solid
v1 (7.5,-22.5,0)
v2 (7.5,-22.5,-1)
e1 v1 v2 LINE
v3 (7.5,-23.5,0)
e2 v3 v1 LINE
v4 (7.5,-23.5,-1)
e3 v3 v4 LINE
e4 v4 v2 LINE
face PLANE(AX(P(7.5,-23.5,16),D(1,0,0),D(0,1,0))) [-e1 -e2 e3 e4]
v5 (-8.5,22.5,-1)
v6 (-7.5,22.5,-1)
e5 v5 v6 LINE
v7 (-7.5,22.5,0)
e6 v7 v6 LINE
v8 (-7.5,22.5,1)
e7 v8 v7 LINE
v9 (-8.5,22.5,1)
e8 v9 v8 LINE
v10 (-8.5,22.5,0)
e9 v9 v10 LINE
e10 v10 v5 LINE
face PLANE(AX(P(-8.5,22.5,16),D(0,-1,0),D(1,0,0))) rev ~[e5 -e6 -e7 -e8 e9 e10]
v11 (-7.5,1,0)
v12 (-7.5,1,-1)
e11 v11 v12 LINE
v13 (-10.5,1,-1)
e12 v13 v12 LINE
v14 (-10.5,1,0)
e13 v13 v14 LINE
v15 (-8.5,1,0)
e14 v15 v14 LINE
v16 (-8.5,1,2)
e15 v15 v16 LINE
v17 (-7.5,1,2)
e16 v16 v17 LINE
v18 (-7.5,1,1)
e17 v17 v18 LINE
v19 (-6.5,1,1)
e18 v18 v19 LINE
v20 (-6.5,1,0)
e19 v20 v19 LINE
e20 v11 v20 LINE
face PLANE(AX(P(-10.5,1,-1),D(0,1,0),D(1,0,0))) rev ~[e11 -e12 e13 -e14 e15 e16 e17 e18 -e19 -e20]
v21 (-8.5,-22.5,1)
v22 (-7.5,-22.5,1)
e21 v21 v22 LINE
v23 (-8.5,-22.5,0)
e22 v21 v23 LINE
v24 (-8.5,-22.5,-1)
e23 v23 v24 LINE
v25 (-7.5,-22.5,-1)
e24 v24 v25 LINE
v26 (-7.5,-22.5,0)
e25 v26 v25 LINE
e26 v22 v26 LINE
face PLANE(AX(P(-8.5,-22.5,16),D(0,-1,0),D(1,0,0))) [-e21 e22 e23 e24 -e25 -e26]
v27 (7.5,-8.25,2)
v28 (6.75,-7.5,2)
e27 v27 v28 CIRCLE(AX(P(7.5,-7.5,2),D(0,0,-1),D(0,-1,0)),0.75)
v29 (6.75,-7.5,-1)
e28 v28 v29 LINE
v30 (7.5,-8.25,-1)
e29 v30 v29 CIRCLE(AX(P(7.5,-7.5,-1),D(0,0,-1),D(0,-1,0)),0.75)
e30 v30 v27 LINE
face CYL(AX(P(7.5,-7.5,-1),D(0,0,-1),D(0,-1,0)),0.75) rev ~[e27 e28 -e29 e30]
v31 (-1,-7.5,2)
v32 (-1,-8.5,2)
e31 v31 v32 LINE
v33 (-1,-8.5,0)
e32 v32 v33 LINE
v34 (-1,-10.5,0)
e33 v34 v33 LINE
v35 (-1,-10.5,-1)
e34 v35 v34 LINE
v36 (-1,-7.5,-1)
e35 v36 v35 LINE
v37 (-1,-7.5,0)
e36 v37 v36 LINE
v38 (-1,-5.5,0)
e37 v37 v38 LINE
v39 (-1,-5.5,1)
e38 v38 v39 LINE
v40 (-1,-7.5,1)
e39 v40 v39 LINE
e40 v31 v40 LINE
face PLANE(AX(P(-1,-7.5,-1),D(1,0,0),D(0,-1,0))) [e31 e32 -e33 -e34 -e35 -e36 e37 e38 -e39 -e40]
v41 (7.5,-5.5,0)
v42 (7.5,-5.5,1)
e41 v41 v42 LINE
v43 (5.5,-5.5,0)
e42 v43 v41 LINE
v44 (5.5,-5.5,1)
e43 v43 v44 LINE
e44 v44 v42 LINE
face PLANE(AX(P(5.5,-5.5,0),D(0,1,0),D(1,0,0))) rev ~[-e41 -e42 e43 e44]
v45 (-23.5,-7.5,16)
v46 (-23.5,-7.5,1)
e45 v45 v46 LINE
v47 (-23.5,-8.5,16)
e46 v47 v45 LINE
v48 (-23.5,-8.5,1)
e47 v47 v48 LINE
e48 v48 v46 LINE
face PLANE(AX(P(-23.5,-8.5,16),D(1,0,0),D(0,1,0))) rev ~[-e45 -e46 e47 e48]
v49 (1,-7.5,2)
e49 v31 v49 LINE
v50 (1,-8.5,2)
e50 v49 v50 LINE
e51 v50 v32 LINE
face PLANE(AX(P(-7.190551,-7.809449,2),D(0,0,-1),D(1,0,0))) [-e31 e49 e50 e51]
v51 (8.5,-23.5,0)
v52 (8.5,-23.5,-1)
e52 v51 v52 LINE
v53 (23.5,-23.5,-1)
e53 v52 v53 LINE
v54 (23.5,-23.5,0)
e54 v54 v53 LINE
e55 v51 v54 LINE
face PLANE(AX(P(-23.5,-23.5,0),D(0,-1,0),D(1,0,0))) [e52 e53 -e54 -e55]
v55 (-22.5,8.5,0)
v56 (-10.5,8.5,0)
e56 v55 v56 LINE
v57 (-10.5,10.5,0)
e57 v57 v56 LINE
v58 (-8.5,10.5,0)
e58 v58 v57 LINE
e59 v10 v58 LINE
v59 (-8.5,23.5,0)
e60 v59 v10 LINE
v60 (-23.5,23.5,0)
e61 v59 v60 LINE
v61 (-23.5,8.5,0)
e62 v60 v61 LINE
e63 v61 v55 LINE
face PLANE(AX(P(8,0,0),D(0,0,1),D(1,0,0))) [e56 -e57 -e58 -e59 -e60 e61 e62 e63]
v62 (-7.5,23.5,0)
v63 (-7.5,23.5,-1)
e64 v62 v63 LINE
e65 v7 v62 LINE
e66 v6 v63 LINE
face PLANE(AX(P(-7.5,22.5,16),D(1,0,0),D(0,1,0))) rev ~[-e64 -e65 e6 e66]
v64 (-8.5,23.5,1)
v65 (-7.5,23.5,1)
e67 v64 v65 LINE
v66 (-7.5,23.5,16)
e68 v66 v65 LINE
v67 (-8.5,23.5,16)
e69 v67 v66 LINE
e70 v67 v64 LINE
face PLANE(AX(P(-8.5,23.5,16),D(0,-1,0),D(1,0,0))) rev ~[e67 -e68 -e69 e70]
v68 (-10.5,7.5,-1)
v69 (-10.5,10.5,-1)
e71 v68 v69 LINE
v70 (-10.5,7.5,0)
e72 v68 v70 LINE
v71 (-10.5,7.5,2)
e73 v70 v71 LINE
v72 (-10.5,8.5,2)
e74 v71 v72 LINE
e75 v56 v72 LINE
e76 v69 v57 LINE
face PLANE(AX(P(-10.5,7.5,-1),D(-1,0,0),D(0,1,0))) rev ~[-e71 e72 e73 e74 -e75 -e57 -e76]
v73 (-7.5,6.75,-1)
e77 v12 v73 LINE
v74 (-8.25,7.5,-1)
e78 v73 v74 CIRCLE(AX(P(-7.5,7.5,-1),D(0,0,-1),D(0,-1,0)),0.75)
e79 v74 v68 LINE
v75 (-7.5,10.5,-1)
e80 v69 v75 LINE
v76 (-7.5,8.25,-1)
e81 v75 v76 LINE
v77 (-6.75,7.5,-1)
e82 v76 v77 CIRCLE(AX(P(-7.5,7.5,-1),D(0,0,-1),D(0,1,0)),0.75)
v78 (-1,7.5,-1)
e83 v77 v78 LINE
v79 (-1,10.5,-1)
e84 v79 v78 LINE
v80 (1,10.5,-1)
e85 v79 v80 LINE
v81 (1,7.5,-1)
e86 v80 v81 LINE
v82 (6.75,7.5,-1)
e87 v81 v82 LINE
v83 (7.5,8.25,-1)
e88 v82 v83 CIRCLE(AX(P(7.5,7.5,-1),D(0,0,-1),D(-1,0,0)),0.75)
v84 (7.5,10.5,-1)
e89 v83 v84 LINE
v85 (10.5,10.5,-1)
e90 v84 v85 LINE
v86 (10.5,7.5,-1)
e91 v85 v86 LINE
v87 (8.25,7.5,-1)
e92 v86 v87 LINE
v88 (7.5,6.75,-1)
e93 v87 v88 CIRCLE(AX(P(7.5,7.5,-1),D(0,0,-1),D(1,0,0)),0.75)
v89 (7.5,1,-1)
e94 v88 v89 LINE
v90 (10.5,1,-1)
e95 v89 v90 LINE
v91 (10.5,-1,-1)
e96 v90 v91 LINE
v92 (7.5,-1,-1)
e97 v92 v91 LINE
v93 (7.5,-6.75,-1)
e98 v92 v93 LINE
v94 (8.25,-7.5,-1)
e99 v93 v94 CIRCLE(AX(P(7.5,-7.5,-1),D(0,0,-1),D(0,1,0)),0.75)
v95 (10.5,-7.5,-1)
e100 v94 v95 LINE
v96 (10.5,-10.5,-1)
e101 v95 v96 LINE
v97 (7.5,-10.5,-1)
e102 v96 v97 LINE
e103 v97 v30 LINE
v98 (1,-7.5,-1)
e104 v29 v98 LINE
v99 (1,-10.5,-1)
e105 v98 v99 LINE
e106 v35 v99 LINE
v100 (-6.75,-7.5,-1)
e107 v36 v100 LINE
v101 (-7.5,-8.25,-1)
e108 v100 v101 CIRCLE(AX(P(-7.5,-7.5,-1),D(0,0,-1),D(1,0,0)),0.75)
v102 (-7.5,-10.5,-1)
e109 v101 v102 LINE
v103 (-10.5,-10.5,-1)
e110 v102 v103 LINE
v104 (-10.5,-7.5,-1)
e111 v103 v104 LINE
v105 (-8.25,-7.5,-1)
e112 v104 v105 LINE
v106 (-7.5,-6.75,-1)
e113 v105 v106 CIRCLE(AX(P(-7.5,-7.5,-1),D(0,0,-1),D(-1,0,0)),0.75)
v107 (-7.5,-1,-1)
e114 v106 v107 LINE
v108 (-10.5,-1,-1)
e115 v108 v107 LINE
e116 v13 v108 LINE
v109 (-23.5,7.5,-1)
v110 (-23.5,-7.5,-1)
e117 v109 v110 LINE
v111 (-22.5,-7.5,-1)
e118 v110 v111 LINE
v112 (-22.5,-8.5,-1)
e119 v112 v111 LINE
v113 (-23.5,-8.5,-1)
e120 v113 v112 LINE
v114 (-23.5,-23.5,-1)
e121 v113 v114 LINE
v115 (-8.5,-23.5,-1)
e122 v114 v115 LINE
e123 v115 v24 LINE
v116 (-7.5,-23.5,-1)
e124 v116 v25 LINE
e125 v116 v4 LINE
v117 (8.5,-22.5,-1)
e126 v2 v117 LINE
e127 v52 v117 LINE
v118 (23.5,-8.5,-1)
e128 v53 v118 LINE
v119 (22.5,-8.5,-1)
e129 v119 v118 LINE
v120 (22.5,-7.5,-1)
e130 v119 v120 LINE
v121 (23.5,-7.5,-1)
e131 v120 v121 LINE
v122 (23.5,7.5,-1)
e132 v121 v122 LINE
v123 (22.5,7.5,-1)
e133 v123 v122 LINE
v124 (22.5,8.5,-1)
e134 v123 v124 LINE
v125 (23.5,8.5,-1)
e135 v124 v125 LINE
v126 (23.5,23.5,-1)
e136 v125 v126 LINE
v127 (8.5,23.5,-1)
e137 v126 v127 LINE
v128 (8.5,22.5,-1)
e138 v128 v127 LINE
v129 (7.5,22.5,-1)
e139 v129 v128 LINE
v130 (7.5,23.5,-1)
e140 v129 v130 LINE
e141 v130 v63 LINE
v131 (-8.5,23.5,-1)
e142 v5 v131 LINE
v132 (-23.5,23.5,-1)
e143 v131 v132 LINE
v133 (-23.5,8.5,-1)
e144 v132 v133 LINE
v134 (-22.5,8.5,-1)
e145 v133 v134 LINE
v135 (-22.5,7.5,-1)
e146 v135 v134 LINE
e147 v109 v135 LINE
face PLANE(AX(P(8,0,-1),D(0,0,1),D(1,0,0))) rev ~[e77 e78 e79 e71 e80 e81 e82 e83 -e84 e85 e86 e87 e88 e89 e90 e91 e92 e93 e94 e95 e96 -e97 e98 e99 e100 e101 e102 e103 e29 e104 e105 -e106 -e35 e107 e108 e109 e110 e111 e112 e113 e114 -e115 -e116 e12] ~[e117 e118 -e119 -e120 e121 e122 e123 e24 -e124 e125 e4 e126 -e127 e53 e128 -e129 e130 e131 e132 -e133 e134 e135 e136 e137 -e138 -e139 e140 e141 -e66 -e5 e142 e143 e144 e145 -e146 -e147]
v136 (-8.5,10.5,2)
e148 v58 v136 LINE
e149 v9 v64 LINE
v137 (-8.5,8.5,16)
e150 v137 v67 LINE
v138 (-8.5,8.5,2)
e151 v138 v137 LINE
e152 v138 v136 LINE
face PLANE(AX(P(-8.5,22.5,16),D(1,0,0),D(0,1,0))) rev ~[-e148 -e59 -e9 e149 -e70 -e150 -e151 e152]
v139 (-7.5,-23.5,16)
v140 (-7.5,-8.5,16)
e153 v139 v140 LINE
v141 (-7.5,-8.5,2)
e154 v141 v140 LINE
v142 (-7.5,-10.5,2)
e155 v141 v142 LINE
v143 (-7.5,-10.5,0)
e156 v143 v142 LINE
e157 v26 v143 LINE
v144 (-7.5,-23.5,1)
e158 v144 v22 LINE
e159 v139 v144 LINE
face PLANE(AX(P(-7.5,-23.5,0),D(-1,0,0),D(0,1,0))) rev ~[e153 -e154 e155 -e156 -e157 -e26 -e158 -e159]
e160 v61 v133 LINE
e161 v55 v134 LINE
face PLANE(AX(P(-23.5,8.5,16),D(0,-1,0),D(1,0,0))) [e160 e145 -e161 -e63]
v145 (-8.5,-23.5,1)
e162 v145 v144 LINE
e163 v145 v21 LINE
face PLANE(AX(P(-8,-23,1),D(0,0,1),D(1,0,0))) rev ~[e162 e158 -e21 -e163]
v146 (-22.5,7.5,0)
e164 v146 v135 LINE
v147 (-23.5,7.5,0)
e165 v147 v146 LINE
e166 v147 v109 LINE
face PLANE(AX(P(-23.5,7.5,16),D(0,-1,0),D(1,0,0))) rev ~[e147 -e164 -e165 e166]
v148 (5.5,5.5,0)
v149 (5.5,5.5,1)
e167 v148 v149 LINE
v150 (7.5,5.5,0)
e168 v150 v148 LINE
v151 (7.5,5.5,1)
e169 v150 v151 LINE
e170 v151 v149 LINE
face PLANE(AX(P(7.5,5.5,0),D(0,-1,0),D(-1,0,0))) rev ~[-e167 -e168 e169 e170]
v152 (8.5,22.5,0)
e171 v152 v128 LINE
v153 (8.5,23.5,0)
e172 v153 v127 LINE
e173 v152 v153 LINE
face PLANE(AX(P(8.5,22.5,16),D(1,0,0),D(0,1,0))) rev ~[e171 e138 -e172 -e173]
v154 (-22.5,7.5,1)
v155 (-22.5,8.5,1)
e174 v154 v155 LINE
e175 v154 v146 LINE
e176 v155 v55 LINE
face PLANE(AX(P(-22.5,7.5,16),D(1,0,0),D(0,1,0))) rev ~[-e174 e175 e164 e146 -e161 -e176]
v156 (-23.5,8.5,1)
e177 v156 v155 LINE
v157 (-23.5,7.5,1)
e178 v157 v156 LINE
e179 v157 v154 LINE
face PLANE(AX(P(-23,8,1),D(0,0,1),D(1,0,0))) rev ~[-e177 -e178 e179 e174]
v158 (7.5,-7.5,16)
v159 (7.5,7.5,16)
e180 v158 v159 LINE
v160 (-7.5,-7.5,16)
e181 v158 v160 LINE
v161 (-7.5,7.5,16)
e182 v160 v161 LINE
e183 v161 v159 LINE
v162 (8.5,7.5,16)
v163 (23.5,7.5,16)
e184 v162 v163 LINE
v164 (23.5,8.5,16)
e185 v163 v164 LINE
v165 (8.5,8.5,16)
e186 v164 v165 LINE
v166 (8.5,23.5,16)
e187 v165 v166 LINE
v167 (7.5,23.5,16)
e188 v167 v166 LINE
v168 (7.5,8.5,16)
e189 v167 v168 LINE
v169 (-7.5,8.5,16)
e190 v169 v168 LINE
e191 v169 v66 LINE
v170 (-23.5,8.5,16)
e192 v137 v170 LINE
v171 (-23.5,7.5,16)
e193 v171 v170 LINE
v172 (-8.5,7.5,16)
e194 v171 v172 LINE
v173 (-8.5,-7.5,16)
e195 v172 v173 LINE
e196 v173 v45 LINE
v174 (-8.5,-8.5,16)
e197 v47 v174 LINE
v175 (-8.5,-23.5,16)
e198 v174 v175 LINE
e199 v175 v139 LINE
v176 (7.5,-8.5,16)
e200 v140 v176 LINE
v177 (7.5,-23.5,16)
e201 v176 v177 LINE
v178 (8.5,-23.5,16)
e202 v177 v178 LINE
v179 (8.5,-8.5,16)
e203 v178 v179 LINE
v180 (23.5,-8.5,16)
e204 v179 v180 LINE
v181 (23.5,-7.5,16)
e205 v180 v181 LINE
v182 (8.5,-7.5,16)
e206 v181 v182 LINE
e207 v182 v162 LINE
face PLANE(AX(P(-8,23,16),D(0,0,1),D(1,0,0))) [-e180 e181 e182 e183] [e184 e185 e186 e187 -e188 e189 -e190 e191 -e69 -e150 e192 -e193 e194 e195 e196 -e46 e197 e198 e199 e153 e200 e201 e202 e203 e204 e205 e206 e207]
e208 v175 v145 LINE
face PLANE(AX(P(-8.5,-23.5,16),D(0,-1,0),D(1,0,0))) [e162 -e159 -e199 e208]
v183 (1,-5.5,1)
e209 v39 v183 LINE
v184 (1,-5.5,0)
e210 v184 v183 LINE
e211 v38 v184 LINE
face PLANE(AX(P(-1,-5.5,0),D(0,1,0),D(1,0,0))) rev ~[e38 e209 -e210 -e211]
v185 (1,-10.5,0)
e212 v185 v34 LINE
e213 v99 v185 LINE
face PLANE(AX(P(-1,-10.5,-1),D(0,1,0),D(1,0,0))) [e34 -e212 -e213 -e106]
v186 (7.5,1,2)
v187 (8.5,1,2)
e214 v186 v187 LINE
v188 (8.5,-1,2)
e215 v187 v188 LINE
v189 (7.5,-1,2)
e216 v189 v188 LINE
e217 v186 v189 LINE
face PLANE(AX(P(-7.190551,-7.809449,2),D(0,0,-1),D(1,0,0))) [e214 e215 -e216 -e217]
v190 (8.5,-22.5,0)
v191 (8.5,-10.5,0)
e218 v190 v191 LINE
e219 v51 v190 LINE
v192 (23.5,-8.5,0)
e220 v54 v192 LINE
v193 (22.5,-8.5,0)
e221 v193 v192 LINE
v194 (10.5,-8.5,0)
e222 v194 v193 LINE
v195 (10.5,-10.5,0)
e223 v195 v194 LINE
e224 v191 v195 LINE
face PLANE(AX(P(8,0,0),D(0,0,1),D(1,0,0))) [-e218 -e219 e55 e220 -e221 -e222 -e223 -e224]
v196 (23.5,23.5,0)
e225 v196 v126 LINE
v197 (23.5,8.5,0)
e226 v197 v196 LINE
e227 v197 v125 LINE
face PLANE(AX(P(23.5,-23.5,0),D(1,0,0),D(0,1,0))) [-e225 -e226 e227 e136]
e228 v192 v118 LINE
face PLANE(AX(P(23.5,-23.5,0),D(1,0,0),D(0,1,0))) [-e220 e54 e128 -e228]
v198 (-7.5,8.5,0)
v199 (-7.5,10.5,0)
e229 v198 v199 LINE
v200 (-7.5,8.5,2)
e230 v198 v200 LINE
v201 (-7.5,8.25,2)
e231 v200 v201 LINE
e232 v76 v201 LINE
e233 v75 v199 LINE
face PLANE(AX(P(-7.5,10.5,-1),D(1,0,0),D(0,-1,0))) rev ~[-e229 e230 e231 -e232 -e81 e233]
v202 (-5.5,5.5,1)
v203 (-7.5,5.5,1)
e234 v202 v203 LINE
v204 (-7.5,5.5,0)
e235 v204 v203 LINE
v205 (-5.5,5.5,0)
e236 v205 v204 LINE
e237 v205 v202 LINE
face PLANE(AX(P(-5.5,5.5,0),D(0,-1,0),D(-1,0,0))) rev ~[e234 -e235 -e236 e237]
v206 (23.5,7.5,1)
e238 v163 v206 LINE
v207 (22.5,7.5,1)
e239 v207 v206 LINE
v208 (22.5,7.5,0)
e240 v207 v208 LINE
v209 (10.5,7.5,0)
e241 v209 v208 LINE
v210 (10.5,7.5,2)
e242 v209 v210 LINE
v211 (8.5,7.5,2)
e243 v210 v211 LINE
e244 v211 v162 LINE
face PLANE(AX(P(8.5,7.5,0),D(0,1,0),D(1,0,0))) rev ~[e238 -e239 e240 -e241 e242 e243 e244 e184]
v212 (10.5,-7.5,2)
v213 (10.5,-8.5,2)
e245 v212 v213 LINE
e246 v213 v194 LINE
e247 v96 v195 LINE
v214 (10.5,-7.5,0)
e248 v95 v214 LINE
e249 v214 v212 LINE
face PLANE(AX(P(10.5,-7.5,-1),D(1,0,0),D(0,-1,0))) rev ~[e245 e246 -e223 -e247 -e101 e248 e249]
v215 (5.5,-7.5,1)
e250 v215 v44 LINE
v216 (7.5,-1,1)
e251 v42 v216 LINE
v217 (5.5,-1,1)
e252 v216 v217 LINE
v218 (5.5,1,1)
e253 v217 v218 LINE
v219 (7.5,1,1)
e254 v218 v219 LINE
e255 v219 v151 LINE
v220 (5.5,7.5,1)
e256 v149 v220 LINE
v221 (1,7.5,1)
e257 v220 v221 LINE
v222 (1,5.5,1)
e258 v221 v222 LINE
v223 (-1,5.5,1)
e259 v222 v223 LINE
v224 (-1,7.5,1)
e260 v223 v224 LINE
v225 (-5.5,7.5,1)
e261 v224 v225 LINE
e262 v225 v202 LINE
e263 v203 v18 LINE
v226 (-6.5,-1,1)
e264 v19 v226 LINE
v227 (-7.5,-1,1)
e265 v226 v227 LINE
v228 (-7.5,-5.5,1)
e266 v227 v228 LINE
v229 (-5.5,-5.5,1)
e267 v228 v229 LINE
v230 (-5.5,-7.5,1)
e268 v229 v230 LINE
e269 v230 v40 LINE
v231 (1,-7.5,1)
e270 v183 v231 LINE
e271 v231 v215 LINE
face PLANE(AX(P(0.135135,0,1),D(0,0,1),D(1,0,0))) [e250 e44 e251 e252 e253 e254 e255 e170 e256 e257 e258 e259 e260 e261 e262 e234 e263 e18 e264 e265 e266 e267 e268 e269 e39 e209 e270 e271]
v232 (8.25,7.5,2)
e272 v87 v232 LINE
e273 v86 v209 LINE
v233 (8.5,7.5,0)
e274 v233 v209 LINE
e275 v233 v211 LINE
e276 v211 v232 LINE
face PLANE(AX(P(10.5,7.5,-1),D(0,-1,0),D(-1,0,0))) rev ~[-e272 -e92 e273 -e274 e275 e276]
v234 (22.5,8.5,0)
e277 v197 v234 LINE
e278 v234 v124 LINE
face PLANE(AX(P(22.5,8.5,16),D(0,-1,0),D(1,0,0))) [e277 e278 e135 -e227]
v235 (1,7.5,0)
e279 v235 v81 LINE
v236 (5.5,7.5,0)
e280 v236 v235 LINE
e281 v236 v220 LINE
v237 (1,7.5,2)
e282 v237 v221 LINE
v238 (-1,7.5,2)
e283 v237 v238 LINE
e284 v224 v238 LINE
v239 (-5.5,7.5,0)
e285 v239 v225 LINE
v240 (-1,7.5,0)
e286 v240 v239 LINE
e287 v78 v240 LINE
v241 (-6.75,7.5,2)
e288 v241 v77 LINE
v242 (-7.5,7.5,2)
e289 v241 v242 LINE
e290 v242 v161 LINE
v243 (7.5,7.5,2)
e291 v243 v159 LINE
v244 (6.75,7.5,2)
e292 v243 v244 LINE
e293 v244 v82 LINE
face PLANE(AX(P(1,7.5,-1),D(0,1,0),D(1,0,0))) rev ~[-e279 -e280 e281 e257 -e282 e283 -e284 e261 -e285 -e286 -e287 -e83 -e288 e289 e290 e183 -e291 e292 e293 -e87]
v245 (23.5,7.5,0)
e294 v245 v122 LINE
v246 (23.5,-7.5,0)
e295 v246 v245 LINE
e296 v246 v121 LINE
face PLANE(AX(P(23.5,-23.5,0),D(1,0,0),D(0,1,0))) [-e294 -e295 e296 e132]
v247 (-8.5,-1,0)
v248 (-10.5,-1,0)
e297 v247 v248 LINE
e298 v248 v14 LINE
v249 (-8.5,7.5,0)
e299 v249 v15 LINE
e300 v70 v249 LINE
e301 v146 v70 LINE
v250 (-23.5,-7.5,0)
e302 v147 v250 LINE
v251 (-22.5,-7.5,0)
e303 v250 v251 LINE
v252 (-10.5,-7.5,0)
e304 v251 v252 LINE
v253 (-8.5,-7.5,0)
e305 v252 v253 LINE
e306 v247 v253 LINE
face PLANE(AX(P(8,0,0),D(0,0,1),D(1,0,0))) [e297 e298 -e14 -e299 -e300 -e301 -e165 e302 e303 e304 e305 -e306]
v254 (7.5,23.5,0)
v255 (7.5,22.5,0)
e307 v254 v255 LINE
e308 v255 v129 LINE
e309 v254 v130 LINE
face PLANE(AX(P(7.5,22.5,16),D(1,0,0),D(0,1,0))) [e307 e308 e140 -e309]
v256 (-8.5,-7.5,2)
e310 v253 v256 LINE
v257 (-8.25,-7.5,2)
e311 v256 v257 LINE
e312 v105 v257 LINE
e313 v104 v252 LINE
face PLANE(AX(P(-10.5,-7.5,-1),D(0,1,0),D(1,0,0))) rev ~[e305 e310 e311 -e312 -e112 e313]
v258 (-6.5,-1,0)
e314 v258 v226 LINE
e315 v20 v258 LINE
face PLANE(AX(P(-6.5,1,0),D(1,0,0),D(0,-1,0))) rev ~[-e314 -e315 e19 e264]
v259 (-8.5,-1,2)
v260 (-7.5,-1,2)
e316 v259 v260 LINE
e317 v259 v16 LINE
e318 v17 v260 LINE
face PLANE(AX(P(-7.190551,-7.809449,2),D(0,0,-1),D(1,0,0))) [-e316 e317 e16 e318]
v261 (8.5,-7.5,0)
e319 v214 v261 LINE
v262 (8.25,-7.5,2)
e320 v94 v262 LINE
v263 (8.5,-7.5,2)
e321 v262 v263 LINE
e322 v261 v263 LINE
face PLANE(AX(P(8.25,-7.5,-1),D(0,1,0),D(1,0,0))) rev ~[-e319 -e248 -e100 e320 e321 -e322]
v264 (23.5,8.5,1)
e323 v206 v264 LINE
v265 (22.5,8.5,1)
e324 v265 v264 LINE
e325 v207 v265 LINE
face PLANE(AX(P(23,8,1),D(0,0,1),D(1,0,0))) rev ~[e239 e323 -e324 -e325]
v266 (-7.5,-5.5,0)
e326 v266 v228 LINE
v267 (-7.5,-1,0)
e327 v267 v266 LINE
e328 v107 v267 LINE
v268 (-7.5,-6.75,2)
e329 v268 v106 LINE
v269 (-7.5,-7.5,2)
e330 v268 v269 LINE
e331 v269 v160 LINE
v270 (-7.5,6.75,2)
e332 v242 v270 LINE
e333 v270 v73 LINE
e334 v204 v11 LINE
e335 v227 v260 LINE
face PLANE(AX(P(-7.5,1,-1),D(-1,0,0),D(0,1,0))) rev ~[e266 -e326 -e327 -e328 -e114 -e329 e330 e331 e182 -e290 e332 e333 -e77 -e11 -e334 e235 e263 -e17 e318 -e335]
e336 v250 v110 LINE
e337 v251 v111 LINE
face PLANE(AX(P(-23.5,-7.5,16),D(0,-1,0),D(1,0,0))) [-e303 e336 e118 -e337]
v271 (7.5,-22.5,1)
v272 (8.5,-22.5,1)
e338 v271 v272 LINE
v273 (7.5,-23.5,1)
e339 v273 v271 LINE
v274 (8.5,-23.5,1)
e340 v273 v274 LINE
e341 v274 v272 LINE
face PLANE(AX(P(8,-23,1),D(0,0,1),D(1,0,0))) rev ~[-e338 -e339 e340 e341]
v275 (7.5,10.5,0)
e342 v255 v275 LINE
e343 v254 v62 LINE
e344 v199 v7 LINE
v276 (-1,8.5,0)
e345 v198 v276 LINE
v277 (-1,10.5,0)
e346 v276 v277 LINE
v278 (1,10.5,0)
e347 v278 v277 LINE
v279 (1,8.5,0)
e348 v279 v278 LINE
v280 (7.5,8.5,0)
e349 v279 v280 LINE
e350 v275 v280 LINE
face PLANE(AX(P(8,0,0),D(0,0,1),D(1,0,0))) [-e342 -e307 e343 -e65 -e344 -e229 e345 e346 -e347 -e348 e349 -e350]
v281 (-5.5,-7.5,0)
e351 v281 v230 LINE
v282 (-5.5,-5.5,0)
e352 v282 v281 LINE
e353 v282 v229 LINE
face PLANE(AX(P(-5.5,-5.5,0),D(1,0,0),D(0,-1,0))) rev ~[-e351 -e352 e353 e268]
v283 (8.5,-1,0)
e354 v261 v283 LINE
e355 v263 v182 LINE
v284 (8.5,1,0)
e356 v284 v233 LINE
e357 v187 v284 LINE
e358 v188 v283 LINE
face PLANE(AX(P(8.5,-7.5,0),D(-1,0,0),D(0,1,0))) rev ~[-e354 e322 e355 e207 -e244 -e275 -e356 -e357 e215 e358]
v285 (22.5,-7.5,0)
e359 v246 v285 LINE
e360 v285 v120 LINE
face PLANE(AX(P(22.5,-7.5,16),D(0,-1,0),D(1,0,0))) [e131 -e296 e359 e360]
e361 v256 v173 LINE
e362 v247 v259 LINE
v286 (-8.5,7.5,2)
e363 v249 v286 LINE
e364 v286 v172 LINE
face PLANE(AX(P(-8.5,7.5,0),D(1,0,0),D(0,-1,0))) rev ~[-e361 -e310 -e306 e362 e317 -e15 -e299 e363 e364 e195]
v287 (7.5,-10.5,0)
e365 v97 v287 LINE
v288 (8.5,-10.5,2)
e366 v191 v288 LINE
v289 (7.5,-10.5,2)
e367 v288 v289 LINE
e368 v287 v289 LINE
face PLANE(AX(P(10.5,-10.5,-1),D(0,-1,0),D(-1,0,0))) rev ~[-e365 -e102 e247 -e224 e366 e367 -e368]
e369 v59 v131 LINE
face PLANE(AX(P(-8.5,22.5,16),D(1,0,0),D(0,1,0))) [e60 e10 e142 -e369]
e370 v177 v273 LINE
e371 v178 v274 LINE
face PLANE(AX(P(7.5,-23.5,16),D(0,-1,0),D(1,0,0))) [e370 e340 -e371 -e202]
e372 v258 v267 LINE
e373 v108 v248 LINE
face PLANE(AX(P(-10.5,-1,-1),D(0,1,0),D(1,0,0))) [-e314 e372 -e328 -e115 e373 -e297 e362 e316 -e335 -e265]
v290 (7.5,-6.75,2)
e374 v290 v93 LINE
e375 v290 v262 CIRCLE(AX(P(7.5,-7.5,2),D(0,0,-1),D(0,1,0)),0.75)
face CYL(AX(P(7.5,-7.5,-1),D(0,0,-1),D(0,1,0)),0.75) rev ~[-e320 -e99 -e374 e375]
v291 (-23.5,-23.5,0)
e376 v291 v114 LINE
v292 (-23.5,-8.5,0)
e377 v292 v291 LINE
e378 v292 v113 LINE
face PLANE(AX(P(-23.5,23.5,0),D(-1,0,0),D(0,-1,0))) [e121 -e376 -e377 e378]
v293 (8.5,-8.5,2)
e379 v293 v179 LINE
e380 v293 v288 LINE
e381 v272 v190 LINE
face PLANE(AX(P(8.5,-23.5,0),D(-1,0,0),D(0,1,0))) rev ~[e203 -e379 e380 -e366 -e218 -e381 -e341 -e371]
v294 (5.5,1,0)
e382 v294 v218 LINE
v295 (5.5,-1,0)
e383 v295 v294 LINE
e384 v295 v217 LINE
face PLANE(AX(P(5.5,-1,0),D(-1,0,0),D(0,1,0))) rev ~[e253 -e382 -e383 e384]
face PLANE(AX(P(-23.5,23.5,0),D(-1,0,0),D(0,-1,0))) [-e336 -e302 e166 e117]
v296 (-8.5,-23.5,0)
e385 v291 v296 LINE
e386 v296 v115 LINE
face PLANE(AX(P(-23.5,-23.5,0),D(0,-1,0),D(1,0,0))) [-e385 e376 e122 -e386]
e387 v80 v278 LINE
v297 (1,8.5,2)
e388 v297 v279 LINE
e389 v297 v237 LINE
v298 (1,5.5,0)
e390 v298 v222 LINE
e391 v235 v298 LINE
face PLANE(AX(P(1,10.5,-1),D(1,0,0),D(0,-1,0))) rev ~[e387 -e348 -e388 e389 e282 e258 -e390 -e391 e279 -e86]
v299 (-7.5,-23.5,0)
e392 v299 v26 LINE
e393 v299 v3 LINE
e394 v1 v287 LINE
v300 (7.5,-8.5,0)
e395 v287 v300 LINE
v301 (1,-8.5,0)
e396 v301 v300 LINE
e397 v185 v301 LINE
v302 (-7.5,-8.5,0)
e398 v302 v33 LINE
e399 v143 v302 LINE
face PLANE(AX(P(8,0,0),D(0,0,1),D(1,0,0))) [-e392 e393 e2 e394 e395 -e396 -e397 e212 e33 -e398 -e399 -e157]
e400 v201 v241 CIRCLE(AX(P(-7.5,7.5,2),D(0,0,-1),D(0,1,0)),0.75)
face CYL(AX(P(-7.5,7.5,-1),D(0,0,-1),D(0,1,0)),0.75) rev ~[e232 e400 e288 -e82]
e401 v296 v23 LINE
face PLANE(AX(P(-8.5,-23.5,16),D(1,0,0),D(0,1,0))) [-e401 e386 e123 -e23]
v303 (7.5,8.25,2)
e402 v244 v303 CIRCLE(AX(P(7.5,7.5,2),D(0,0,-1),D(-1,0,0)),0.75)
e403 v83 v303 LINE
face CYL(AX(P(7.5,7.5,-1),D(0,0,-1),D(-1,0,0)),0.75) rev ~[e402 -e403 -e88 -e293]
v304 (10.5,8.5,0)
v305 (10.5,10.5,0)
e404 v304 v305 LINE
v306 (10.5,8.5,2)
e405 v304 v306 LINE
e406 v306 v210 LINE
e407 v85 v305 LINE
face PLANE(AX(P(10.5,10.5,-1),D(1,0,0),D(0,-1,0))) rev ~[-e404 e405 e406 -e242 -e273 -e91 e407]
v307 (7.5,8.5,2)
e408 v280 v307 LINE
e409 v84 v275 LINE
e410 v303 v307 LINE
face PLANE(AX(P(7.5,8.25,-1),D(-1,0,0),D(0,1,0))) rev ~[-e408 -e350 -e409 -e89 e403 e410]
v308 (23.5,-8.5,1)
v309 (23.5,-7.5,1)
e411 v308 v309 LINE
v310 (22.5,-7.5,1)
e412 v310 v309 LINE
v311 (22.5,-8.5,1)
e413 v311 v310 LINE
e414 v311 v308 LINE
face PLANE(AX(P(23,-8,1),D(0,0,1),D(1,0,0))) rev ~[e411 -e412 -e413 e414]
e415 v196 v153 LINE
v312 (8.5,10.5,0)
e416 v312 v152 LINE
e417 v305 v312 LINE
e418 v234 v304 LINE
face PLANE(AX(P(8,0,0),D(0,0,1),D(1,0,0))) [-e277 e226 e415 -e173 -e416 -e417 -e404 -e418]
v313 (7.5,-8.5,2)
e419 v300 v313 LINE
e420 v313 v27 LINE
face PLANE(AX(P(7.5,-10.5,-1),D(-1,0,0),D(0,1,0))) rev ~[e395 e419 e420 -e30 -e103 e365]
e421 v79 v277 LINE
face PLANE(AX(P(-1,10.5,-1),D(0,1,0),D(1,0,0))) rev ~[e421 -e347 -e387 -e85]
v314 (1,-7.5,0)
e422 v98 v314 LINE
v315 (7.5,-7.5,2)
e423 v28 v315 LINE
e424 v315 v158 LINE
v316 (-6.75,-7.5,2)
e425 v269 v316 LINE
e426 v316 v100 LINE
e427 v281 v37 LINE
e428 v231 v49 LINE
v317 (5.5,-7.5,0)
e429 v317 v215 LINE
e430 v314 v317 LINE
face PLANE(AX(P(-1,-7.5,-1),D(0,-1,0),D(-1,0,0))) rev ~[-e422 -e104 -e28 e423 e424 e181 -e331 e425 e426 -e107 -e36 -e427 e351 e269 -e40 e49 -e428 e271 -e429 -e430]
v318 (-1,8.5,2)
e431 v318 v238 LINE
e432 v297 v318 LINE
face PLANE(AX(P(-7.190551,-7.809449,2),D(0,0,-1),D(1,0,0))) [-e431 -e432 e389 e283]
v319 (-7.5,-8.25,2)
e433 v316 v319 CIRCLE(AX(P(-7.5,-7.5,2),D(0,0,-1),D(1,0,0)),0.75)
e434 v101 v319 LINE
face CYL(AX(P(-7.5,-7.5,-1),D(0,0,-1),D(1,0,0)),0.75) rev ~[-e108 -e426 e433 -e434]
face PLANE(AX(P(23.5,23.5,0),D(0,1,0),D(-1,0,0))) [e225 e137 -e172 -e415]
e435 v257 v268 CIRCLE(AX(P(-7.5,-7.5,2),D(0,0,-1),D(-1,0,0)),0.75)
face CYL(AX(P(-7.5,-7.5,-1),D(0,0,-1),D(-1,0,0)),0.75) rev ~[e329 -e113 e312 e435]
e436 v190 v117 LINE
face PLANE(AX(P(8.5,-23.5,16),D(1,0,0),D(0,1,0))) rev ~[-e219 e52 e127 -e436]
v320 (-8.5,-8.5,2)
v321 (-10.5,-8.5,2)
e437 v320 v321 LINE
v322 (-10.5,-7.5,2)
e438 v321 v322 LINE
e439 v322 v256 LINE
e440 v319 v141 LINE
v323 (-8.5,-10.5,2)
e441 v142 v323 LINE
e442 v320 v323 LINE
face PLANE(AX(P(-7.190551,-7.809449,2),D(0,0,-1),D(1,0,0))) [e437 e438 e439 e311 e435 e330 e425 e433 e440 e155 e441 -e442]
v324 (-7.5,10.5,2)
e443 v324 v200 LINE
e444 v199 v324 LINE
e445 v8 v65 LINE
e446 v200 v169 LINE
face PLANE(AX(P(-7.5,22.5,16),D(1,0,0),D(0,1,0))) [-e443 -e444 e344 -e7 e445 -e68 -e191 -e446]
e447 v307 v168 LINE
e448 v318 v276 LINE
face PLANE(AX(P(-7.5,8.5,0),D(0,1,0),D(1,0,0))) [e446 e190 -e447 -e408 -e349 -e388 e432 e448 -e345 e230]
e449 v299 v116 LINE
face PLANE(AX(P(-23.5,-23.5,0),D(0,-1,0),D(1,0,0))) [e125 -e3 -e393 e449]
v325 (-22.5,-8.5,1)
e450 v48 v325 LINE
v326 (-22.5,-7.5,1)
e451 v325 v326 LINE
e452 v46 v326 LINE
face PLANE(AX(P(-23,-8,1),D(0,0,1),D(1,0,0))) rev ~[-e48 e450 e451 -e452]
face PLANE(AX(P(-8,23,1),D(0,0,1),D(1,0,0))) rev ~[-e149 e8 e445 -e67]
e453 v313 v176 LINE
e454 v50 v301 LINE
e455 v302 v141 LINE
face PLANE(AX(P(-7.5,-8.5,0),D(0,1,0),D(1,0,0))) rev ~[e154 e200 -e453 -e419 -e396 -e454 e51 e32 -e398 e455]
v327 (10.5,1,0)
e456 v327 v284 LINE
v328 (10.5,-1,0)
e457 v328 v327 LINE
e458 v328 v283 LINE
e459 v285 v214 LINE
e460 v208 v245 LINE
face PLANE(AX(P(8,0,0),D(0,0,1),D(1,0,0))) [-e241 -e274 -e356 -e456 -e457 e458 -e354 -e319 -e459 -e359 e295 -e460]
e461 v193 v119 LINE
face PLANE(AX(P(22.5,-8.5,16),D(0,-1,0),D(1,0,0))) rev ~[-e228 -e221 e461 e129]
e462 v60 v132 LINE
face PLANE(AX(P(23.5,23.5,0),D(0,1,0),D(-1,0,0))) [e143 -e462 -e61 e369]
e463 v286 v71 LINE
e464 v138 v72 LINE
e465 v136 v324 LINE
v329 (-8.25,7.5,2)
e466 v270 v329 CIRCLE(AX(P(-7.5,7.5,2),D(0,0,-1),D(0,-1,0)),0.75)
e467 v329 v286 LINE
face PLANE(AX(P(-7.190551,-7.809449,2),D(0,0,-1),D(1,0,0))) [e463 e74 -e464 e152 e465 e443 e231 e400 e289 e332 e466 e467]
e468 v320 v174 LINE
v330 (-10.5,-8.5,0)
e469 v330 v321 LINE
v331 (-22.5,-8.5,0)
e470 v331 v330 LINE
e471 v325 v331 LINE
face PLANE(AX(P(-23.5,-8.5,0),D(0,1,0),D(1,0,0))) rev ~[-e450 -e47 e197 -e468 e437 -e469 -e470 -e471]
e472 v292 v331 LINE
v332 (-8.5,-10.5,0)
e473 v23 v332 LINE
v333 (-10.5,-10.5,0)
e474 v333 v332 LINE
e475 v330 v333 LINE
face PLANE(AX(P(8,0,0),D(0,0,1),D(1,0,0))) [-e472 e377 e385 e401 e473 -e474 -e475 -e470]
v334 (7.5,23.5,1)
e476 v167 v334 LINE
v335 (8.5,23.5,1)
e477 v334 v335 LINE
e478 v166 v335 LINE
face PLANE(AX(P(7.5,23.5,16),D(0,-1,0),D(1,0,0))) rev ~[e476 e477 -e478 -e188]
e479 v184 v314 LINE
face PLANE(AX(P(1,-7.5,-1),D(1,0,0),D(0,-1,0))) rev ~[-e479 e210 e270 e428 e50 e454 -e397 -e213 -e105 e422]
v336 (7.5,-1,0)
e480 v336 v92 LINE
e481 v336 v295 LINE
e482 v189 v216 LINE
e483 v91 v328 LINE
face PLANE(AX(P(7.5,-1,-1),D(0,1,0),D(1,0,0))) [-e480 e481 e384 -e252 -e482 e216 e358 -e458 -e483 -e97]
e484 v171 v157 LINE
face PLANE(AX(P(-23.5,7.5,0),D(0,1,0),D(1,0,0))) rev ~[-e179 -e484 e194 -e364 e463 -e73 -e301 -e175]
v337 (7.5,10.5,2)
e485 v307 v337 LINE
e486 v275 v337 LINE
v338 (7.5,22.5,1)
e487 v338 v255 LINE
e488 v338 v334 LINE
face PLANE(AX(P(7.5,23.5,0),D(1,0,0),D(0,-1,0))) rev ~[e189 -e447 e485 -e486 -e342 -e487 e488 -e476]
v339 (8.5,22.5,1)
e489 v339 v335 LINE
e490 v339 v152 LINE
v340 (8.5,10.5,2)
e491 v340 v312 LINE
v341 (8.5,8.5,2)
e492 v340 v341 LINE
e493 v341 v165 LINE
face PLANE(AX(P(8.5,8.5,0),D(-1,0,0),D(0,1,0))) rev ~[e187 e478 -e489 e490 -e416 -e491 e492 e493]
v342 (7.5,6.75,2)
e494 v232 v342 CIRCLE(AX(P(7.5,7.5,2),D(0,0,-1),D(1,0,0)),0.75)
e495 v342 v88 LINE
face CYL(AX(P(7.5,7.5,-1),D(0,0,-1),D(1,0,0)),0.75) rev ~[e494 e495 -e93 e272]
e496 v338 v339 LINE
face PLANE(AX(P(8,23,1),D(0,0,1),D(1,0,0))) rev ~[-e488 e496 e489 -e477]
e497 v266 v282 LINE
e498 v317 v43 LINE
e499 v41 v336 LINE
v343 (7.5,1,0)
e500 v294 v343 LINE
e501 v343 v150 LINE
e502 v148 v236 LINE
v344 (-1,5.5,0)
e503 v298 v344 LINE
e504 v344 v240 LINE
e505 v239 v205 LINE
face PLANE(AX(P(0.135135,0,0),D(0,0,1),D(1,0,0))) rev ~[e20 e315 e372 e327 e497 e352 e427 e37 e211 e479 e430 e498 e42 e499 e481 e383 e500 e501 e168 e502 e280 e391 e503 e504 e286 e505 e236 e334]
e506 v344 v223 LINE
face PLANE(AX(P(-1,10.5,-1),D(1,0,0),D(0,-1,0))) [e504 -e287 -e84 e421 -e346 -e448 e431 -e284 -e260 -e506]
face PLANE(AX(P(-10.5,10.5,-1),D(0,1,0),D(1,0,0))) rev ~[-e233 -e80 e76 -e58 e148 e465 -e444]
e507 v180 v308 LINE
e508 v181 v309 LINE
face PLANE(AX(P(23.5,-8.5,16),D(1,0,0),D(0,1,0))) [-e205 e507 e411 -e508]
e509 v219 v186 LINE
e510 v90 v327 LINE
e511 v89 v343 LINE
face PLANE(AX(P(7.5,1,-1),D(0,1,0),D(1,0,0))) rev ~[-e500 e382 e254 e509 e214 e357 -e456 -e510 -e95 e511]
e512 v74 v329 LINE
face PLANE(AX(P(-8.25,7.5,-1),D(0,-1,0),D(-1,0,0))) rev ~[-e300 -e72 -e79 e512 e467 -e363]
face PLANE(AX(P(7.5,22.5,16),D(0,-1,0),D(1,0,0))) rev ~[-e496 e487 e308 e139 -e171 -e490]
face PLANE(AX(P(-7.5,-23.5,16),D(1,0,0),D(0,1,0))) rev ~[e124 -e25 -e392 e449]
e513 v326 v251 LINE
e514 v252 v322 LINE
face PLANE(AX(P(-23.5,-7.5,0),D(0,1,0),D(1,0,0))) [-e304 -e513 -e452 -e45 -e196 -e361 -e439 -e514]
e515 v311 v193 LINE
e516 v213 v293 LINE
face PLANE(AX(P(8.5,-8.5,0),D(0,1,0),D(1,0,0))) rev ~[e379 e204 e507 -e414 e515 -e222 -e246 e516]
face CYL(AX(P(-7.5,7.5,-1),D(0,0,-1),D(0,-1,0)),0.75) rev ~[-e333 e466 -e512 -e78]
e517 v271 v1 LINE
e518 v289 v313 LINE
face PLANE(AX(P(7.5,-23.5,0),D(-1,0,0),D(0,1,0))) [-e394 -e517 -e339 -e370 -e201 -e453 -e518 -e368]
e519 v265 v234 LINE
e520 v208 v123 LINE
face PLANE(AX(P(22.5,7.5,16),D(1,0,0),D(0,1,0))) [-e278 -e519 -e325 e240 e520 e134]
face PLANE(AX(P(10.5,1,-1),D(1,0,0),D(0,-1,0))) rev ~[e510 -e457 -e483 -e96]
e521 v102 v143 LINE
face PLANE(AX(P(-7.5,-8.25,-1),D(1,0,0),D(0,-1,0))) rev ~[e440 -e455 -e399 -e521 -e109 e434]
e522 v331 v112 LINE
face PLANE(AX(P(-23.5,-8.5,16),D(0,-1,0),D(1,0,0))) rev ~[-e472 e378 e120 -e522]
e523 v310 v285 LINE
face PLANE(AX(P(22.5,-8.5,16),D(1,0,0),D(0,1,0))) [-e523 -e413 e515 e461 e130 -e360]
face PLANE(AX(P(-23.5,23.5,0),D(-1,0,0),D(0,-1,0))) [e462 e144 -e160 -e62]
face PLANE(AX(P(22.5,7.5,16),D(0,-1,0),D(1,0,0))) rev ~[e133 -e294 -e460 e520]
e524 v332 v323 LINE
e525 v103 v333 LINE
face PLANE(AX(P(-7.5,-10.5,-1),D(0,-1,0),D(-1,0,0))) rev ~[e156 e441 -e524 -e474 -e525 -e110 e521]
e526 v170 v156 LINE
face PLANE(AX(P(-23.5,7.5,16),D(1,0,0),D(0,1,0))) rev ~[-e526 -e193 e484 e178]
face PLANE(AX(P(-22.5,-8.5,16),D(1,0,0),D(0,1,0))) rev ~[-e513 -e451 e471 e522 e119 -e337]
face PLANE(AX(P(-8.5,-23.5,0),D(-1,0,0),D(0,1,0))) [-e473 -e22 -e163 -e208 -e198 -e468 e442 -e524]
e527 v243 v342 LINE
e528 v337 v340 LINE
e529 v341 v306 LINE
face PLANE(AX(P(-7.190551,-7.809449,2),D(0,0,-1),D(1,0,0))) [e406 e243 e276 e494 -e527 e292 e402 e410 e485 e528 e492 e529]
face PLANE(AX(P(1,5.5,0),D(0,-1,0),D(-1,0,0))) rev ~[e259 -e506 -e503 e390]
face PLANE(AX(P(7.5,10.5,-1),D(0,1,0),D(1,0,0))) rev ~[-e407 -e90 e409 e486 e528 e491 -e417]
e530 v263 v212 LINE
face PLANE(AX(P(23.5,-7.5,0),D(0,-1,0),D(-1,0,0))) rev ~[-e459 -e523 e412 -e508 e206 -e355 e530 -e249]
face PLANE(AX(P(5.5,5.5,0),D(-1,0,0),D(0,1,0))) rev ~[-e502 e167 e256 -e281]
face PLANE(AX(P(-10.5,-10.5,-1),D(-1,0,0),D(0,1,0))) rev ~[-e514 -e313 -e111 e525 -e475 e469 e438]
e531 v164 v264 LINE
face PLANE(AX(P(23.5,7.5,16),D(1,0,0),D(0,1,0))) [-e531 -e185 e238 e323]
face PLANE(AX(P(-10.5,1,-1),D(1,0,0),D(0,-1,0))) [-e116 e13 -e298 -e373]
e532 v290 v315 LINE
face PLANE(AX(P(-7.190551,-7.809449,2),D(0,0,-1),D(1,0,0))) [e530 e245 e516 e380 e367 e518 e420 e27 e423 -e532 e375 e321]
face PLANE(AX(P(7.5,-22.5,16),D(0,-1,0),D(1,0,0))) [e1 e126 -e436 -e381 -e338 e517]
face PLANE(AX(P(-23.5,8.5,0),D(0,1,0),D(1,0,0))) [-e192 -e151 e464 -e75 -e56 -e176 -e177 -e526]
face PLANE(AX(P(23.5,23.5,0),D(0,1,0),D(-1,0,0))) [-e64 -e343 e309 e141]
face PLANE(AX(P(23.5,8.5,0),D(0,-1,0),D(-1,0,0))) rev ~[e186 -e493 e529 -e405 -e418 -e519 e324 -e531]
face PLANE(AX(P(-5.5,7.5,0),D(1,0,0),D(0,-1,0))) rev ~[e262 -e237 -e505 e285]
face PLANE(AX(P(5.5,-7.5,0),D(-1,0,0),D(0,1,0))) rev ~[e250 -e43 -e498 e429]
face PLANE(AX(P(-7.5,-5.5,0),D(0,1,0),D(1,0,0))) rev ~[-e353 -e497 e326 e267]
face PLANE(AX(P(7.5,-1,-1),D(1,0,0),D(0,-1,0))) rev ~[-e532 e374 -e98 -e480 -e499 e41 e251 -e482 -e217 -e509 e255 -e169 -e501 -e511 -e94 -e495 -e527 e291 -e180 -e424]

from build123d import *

# Parameters (mm, degrees)
F0_W     = 1
F0_H     = 15
F0_W_2   = 15
F0_H_2   = 1
F1_DEPTH = 1
F2_DEPTH = 16
F3_W     = 2
F3_H     = 3
F3_W_2   = 3
F3_H_2   = 2
F4_DEPTH = 3
F5_W     = 1
F5_H     = 1
F6_DEPTH = 25
F7_DEPTH = 15
F9_DEPTH = 1


with BuildPart() as f1:
    # F0 (on Top) → F1 (new body)
    with BuildSketch(Plane.XY):
        with Locations((8, 0)):
            Rectangle(F0_W, F0_H)
        with Locations((-16, -8)):
            Rectangle(F0_W_2, F0_H_2)
        with Locations((-16, 0)):
            Rectangle(F0_W_2, F0_H)
        with Locations((8, -16)):
            Rectangle(F0_W, F0_H)
        with Locations((0, -16)):
            Rectangle(F0_W_2, F0_H)
        with Locations((-8, -16)):
            Rectangle(F0_W, F0_H)
        with Locations((16, -16)):
            Rectangle(F0_W_2, F0_H)
        with Locations((-16, -16)):
            Rectangle(F0_W_2, F0_H)
        with Locations((16, 0)):
            Rectangle(F0_W_2, F0_H)
        with Locations((16, -8)):
            Rectangle(F0_W_2, F0_H_2)
        with Locations((0, -8)):
            Rectangle(F0_W_2, F0_H_2)
        with Locations((-8, 0)):
            Rectangle(F0_W, F0_H)
        Rectangle(F0_W_2, F0_H)
        with Locations((8, -8)):
            Rectangle(F0_W, F0_H_2)
        with Locations((-8, -8)):
            Rectangle(F0_W, F0_H_2)
        with Locations((-8, 8)):
            Rectangle(F0_W, F0_H_2)
        with Locations((-16, 8)):
            Rectangle(F0_W_2, F0_H_2)
        with Locations((8, 16)):
            Rectangle(F0_W, F0_H)
        with Locations((0, 16)):
            Rectangle(F0_W_2, F0_H)
        with Locations((-8, 16)):
            Rectangle(F0_W, F0_H)
        with Locations((16, 16)):
            Rectangle(F0_W_2, F0_H)
        with Locations((16, 8)):
            Rectangle(F0_W_2, F0_H_2)
        with Locations((-16, 16)):
            Rectangle(F0_W_2, F0_H)
        with Locations((8, 8)):
            Rectangle(F0_W, F0_H_2)
        with Locations((0, 8)):
            Rectangle(F0_W_2, F0_H_2)
    extrude(amount=-F1_DEPTH)

    # F0 (on Top) → F2 (join)
    with BuildSketch(Plane.XY):
        with Locations((-8, -8)):
            Rectangle(F0_W, F0_H_2)
        with Locations((8, -8)):
            Rectangle(F0_W, F0_H_2)
        with Locations((-8, 8)):
            Rectangle(F0_W, F0_H_2)
        with Locations((8, 8)):
            Rectangle(F0_W, F0_H_2)
        with Locations((16, 8)):
            Rectangle(F0_W_2, F0_H_2)
        with Locations((8, 16)):
            Rectangle(F0_W, F0_H)
        with Locations((-8, 16)):
            Rectangle(F0_W, F0_H)
        with Locations((0, 8)):
            Rectangle(F0_W_2, F0_H_2)
        with Locations((-16, 8)):
            Rectangle(F0_W_2, F0_H_2)
        with Locations((-8, 0)):
            Rectangle(F0_W, F0_H)
        with Locations((-16, -8)):
            Rectangle(F0_W_2, F0_H_2)
        with Locations((0, -8)):
            Rectangle(F0_W_2, F0_H_2)
        with Locations((16, -8)):
            Rectangle(F0_W_2, F0_H_2)
        with Locations((8, -16)):
            Rectangle(F0_W, F0_H)
        with Locations((-8, -16)):
            Rectangle(F0_W, F0_H)
        with Locations((8, 0)):
            Rectangle(F0_W, F0_H)
    extrude(amount=F2_DEPTH)

    # F3 (on face) → F4 (cut)
    with BuildSketch(Plane(origin=(0, 0, -1), x_dir=(1, 0, 0), z_dir=(0, 0, -1))):
        with BuildLine():
            Line((-7.5, 8.25), (-7.5, 7.5))
            Line((-7.5, 7.5), (-6.75, 7.5))
            ThreePointArc((-6.75, 7.5), (-6.9696699141, 8.0303300859), (-7.5, 8.25))
        make_face()
        with BuildLine():
            Line((-6.75, 7.5), (-7.5, 7.5))
            Line((-7.5, 7.5), (-7.5, 6.75))
            ThreePointArc((-7.5, 6.75), (-6.9696699141, 6.9696699141), (-6.75, 7.5))
        make_face()
        with BuildLine():
            Line((-7.5, 6.75), (-7.5, 7.5))
            Line((-7.5, 7.5), (-8.25, 7.5))
            ThreePointArc((-8.25, 7.5), (-8.0303300859, 6.9696699141), (-7.5, 6.75))
        make_face()
        with BuildLine():
            Line((-8.25, 7.5), (-7.5, 7.5))
            Line((-7.5, 7.5), (-7.5, 8.25))
            ThreePointArc((-7.5, 8.25), (-8.0303300859, 8.0303300859), (-8.25, 7.5))
        make_face()
        with BuildLine():
            Line((-1, 7.5), (-6.75, 7.5))
            ThreePointArc((-6.75, 7.5), (-6.9696699141, 6.9696699141), (-7.5, 6.75))
            Line((-7.5, 6.75), (-7.5, 1))
            Line((-7.5, 1), (-7.5, -1))
            Line((-7.5, -1), (-7.5, -6.75))
            ThreePointArc((-7.5, -6.75), (-6.9696699141, -6.9696699141), (-6.75, -7.5))
            Line((-6.75, -7.5), (-1, -7.5))
            Line((-1, -7.5), (1, -7.5))
            Line((1, -7.5), (6.75, -7.5))
            ThreePointArc((6.75, -7.5), (6.9696699141, -6.9696699141), (7.5, -6.75))
            Line((7.5, -6.75), (7.5, -1))
            Line((7.5, -1), (7.5, 1))
            Line((7.5, 1), (7.5, 6.75))
            ThreePointArc((7.5, 6.75), (6.9696699141, 6.9696699141), (6.75, 7.5))
            Line((6.75, 7.5), (1, 7.5))
            Line((1, 7.5), (-1, 7.5))
        make_face()
        with BuildLine():
            Line((-10.5, 7.5), (-8.25, 7.5))
            ThreePointArc((-8.25, 7.5), (-8.0303300859, 8.0303300859), (-7.5, 8.25))
            Line((-7.5, 8.25), (-7.5, 10.5))
            Line((-7.5, 10.5), (-10.5, 10.5))
            Line((-10.5, 10.5), (-10.5, 7.5))
        make_face()
        with Locations((0, 9)):
            Rectangle(F3_W, F3_H)
        with Locations((-9, 0)):
            Rectangle(F3_W_2, F3_H_2)
        with BuildLine():
            ThreePointArc((7.5, 8.25), (6.9696699141, 8.0303300859), (6.75, 7.5))
            Line((6.75, 7.5), (7.5, 7.5))
            Line((7.5, 7.5), (7.5, 8.25))
        make_face()
        with BuildLine():
            Line((7.5, 7.5), (6.75, 7.5))
            ThreePointArc((6.75, 7.5), (6.9696699141, 6.9696699141), (7.5, 6.75))
            Line((7.5, 6.75), (7.5, 7.5))
        make_face()
        with BuildLine():
            ThreePointArc((-6.75, -7.5), (-6.9696699141, -6.9696699141), (-7.5, -6.75))
            Line((-7.5, -6.75), (-7.5, -7.5))
            Line((-7.5, -7.5), (-6.75, -7.5))
        make_face()
        with BuildLine():
            Line((-7.5, -7.5), (-7.5, -6.75))
            ThreePointArc((-7.5, -6.75), (-8.0303300859, -6.9696699141), (-8.25, -7.5))
            Line((-8.25, -7.5), (-7.5, -7.5))
        make_face()
        with BuildLine():
            Line((8.25, 7.5), (7.5, 7.5))
            Line((7.5, 7.5), (7.5, 6.75))
            ThreePointArc((7.5, 6.75), (8.0303300859, 6.9696699141), (8.25, 7.5))
        make_face()
        with BuildLine():
            Line((7.5, 8.25), (7.5, 7.5))
            Line((7.5, 7.5), (8.25, 7.5))
            ThreePointArc((8.25, 7.5), (8.0303300859, 8.0303300859), (7.5, 8.25))
        make_face()
        with BuildLine():
            Line((7.5, 10.5), (7.5, 8.25))
            ThreePointArc((7.5, 8.25), (8.0303300859, 8.0303300859), (8.25, 7.5))
            Line((8.25, 7.5), (10.5, 7.5))
            Line((10.5, 7.5), (10.5, 10.5))
            Line((10.5, 10.5), (7.5, 10.5))
        make_face()
        with BuildLine():
            Line((-7.5, -8.25), (-7.5, -7.5))
            Line((-7.5, -7.5), (-8.25, -7.5))
            ThreePointArc((-8.25, -7.5), (-8.0303300859, -8.0303300859), (-7.5, -8.25))
        make_face()
        with BuildLine():
            Line((-6.75, -7.5), (-7.5, -7.5))
            Line((-7.5, -7.5), (-7.5, -8.25))
            ThreePointArc((-7.5, -8.25), (-6.9696699141, -8.0303300859), (-6.75, -7.5))
        make_face()
        with BuildLine():
            ThreePointArc((-7.5, -8.25), (-8.0303300859, -8.0303300859), (-8.25, -7.5))
            Line((-8.25, -7.5), (-10.5, -7.5))
            Line((-10.5, -7.5), (-10.5, -10.5))
            Line((-10.5, -10.5), (-7.5, -10.5))
            Line((-7.5, -10.5), (-7.5, -8.25))
        make_face()
        with Locations((9, 0)):
            Rectangle(F3_W_2, F3_H_2)
        with Locations((0, -9)):
            Rectangle(F3_W, F3_H)
        with BuildLine():
            ThreePointArc((8.25, -7.5), (8.0303300859, -6.9696699141), (7.5, -6.75))
            Line((7.5, -6.75), (7.5, -7.5))
            Line((7.5, -7.5), (8.25, -7.5))
        make_face()
        with BuildLine():
            Line((7.5, -7.5), (7.5, -6.75))
            ThreePointArc((7.5, -6.75), (6.9696699141, -6.9696699141), (6.75, -7.5))
            Line((6.75, -7.5), (7.5, -7.5))
        make_face()
        with BuildLine():
            Line((7.5, -7.5), (6.75, -7.5))
            ThreePointArc((6.75, -7.5), (6.9696699141, -8.0303300859), (7.5, -8.25))
            Line((7.5, -8.25), (7.5, -7.5))
        make_face()
        with BuildLine():
            Line((8.25, -7.5), (7.5, -7.5))
            Line((7.5, -7.5), (7.5, -8.25))
            ThreePointArc((7.5, -8.25), (8.0303300859, -8.0303300859), (8.25, -7.5))
        make_face()
        with BuildLine():
            Line((10.5, -7.5), (8.25, -7.5))
            ThreePointArc((8.25, -7.5), (8.0303300859, -8.0303300859), (7.5, -8.25))
            Line((7.5, -8.25), (7.5, -10.5))
            Line((7.5, -10.5), (10.5, -10.5))
            Line((10.5, -10.5), (10.5, -7.5))
        make_face()
    extrude(amount=-F4_DEPTH, mode=Mode.SUBTRACT)

    # F5 (on face) → F6 (cut)
    with BuildSketch(Plane.XY.offset(16)):
        with Locations((-8, 23)):
            Rectangle(F5_W, F5_H)
        with Locations((-23, 8)):
            Rectangle(F5_W, F5_H)
        with Locations((8, 23)):
            Rectangle(F5_W, F5_H)
        with Locations((23, 8)):
            Rectangle(F5_W, F5_H)
        with Locations((23, -8)):
            Rectangle(F5_W, F5_H)
        with Locations((8, -23)):
            Rectangle(F5_W, F5_H)
        with Locations((-8, -23)):
            Rectangle(F5_W, F5_H)
        with Locations((-23, -8)):
            Rectangle(F5_W, F5_H)
    extrude(amount=-F6_DEPTH, mode=Mode.SUBTRACT)

    # F5 (on face) → F7 (join)
    with BuildSketch(Plane.XY.offset(16)):
        with Locations((-8, 23)):
            Rectangle(F5_W, F5_H)
        with Locations((-23, 8)):
            Rectangle(F5_W, F5_H)
        with Locations((8, 23)):
            Rectangle(F5_W, F5_H)
        with Locations((23, 8)):
            Rectangle(F5_W, F5_H)
        with Locations((23, -8)):
            Rectangle(F5_W, F5_H)
        with Locations((8, -23)):
            Rectangle(F5_W, F5_H)
        with Locations((-8, -23)):
            Rectangle(F5_W, F5_H)
        with Locations((-23, -8)):
            Rectangle(F5_W, F5_H)
    extrude(amount=-F7_DEPTH)

    # F8 (on Top) → F9 (join)
    with BuildSketch(Plane.XY):
        Polygon((-1, 7.5), (-5.5, 7.5), (-5.5, 5.5), (-7.5, 5.5), (-7.5, 1), (-6.5, 1), (-6.5, -1), (-7.5, -1), (-7.5, -5.5), (-5.5, -5.5), (-5.5, -7.5), (-1, -7.5), (-1, -5.5), (1, -5.5), (1, -7.5), (5.5, -7.5), (5.5, -5.5), (7.5, -5.5), (7.5, -1), (5.5, -1), (5.5, 1), (7.5, 1), (7.5, 5.5), (5.5, 5.5), (5.5, 7.5), (1, 7.5), (1, 5.5), (-1, 5.5), align=None)
    extrude(amount=F9_DEPTH)


solid = f1.part
